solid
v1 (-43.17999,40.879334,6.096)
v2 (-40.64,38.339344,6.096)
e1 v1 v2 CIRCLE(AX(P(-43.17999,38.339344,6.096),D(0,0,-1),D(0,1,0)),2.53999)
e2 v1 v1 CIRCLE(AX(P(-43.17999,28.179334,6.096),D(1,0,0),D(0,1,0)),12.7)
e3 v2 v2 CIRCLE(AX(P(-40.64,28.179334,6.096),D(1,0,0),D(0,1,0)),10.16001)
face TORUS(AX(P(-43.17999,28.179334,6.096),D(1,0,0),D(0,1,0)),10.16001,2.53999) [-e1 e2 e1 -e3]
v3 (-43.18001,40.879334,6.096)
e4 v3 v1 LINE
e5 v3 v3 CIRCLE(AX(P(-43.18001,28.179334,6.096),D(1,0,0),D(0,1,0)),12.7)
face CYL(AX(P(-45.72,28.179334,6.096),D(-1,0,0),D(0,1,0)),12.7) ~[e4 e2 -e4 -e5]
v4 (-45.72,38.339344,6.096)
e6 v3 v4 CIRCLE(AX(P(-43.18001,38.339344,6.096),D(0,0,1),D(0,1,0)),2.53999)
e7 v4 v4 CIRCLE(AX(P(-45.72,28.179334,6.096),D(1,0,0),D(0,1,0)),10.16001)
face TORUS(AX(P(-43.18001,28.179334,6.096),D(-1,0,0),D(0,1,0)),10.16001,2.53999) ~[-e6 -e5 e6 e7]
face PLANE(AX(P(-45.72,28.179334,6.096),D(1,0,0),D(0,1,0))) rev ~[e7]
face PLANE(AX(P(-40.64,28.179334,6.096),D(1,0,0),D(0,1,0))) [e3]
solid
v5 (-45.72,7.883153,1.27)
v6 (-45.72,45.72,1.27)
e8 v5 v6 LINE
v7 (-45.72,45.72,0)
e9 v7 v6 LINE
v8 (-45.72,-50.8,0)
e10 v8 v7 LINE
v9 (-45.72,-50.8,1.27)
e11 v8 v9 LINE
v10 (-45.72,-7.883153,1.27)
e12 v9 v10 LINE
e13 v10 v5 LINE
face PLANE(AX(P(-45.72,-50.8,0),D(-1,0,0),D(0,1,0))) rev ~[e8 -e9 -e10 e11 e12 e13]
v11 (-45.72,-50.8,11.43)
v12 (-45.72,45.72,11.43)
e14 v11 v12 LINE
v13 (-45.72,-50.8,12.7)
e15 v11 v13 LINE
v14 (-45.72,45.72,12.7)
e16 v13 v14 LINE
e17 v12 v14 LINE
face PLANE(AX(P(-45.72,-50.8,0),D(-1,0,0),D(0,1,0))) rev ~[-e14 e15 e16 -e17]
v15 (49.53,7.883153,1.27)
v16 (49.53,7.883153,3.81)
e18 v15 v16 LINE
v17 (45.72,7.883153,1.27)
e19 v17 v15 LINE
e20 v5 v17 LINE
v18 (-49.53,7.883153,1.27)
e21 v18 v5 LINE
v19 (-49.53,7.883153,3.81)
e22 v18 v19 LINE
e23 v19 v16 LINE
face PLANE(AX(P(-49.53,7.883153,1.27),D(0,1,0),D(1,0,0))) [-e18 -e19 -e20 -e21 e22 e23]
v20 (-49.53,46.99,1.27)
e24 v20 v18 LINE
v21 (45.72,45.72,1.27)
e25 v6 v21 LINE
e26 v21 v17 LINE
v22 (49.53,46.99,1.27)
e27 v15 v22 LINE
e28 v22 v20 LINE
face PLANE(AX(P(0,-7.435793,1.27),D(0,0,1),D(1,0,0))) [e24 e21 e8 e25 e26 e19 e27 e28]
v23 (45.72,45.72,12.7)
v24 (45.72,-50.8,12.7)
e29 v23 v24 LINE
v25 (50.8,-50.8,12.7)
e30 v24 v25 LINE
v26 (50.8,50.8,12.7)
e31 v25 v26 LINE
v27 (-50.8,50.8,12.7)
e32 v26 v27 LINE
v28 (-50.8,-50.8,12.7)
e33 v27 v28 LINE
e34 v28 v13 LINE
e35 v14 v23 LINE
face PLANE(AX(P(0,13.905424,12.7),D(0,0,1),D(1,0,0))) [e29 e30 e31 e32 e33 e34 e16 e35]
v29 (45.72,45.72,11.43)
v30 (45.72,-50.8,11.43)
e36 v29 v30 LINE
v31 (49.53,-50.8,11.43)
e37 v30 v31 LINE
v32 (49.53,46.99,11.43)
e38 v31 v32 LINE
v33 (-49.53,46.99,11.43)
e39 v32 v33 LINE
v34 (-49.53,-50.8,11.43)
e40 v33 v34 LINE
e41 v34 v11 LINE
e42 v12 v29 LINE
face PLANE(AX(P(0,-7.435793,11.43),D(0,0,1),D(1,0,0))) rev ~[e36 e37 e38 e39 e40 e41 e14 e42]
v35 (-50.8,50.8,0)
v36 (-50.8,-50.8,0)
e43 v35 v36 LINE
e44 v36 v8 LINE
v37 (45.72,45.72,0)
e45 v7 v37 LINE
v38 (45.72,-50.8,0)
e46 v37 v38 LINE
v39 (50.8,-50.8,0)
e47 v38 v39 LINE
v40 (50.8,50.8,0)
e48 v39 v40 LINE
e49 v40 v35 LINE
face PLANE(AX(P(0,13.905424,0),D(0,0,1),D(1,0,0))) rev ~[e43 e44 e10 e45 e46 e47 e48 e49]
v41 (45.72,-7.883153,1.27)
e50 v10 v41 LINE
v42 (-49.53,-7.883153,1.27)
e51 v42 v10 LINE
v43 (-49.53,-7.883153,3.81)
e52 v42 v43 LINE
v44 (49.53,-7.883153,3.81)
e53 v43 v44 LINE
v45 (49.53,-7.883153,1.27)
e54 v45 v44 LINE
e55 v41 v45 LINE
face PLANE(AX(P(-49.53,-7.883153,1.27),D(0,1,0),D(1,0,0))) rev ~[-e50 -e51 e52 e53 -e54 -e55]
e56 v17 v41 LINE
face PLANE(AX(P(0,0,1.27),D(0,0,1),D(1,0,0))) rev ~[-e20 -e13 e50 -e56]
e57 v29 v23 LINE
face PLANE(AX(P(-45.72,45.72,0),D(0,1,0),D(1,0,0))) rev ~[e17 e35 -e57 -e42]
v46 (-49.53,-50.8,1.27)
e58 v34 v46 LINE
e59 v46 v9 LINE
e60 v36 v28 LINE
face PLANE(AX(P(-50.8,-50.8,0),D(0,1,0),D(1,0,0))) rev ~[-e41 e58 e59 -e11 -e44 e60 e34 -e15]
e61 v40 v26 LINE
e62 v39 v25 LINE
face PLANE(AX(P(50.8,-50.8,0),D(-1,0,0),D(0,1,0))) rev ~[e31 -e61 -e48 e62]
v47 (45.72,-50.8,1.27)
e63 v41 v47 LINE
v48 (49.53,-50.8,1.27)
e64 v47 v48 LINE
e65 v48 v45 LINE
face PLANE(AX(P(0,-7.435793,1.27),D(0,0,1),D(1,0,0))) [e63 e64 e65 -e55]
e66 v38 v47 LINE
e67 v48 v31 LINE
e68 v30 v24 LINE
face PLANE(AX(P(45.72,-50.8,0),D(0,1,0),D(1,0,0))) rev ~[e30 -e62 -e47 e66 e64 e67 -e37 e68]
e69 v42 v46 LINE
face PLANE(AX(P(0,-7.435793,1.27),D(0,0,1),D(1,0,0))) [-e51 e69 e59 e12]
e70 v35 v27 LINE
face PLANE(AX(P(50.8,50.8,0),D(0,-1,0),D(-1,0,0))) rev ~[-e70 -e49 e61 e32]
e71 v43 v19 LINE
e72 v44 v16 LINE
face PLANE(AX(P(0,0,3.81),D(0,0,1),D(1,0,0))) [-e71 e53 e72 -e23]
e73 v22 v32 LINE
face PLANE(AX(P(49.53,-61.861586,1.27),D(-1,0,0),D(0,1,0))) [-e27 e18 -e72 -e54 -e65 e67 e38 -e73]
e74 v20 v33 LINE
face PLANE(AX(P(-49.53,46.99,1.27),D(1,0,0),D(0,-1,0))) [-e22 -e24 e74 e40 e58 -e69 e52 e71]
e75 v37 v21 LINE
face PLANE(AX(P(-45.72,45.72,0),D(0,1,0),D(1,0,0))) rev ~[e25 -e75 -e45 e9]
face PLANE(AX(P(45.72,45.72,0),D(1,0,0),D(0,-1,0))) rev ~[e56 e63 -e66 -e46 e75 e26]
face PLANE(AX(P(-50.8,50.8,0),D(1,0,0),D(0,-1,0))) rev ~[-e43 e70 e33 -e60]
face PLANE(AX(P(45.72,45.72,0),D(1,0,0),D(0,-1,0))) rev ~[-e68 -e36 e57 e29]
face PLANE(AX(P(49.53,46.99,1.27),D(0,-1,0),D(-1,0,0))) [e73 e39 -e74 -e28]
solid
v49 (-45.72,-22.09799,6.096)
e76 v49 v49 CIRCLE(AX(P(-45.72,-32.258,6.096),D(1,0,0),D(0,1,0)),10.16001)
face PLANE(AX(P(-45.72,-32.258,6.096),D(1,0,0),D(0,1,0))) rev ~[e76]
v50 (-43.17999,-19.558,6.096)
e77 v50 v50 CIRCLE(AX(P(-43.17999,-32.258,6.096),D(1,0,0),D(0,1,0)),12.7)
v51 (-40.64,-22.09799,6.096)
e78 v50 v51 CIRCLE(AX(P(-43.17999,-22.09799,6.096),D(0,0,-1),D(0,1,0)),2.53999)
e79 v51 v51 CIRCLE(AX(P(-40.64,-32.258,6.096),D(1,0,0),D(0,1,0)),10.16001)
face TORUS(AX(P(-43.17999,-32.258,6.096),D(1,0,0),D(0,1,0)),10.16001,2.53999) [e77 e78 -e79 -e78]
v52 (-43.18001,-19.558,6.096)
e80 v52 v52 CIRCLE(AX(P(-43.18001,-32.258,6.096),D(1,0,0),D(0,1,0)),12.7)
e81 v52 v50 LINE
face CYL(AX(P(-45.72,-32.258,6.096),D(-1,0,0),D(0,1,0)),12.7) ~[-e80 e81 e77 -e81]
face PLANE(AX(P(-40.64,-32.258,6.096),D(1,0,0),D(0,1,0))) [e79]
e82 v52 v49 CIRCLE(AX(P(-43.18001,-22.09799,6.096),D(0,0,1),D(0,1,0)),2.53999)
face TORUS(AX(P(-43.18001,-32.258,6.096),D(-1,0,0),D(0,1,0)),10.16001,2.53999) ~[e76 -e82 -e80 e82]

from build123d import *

# Parameters (mm, degrees)
F1_DEPTH  = 12.7
F3_R      = 12.7
F4_DEPTH  = 5.08
F5_R      = 2.53999
F5_2_R    = 2.53999
F8_DEPTH  = 10.16
F9_W      = 99.06
F9_H      = 15.766306633
F10_DEPTH = 2.54


# Not quite as in the source:
# - a fillet or chamfer is up to 0.001 mm smaller than in the source, because OpenCascade refuses the exact size


with BuildPart() as f1:
    # F0 (on Top) → F1 (new body)
    with BuildSketch(Plane.XY):
        Polygon((50.8, -50.8), (50.8, 50.8), (-50.8, 50.8), (-50.8, -50.8), (-45.72, -50.8), (-45.72, -45.72), (-45.72, 45.72), (45.72, 45.72), (45.72, -45.72), (45.72, -50.8), align=None)
    extrude(amount=F1_DEPTH)

    # F7 (on offset) → F8 (cut)
    with BuildSketch(Plane.XY.offset(1.27)):
        Polygon((49.53, 46.99), (-49.53, 46.99), (-49.53, -46.99), (-49.53, -61.8615858257), (49.53, -61.8615858257), (49.53, -46.99), align=None)
    extrude(amount=F8_DEPTH, mode=Mode.SUBTRACT)

    # F9 (on offset) → F10 (join)
    with BuildSketch(Plane.XY.offset(1.27)):
        Rectangle(F9_W, F9_H)
    extrude(amount=F10_DEPTH)


with BuildPart() as f4:
    # F3 (on offset) → F4 (new body)
    with BuildSketch(Plane.YZ.offset(-45.72)):
        with Locations((-32.2580002248, 6.0960003175)):
            Circle(F3_R)
    extrude(amount=F4_DEPTH)

    # F5 (radius 2.54 in the source; OpenCascade refuses exactly that, so slightly less here)
    f5_edges = [f4.edges().sort_by_distance(p)[0] for p in [
        (-40.64, -44.958, 6.096),
        (-45.72, -44.958, 6.096),
    ]]
    fillet(f5_edges, radius=F5_R)


with BuildPart() as f4b:
    # F3 (on offset) → F4, piece 2 (new body)
    with BuildSketch(Plane.YZ.offset(-45.72)):
        with Locations((28.1793344766, 6.0960003175)):
            Circle(F3_R)
    extrude(amount=F4_DEPTH)

    # F5#2 (radius 2.54 in the source; OpenCascade refuses exactly that, so slightly less here)
    f5_2_edges = [f4b.edges().sort_by_distance(p)[0] for p in [
        (-45.72, 15.479334, 6.096),
        (-40.64, 15.479334, 6.096),
    ]]
    fillet(f5_2_edges, radius=F5_2_R)


solid = Compound([f1.part, f4.part, f4b.part])
